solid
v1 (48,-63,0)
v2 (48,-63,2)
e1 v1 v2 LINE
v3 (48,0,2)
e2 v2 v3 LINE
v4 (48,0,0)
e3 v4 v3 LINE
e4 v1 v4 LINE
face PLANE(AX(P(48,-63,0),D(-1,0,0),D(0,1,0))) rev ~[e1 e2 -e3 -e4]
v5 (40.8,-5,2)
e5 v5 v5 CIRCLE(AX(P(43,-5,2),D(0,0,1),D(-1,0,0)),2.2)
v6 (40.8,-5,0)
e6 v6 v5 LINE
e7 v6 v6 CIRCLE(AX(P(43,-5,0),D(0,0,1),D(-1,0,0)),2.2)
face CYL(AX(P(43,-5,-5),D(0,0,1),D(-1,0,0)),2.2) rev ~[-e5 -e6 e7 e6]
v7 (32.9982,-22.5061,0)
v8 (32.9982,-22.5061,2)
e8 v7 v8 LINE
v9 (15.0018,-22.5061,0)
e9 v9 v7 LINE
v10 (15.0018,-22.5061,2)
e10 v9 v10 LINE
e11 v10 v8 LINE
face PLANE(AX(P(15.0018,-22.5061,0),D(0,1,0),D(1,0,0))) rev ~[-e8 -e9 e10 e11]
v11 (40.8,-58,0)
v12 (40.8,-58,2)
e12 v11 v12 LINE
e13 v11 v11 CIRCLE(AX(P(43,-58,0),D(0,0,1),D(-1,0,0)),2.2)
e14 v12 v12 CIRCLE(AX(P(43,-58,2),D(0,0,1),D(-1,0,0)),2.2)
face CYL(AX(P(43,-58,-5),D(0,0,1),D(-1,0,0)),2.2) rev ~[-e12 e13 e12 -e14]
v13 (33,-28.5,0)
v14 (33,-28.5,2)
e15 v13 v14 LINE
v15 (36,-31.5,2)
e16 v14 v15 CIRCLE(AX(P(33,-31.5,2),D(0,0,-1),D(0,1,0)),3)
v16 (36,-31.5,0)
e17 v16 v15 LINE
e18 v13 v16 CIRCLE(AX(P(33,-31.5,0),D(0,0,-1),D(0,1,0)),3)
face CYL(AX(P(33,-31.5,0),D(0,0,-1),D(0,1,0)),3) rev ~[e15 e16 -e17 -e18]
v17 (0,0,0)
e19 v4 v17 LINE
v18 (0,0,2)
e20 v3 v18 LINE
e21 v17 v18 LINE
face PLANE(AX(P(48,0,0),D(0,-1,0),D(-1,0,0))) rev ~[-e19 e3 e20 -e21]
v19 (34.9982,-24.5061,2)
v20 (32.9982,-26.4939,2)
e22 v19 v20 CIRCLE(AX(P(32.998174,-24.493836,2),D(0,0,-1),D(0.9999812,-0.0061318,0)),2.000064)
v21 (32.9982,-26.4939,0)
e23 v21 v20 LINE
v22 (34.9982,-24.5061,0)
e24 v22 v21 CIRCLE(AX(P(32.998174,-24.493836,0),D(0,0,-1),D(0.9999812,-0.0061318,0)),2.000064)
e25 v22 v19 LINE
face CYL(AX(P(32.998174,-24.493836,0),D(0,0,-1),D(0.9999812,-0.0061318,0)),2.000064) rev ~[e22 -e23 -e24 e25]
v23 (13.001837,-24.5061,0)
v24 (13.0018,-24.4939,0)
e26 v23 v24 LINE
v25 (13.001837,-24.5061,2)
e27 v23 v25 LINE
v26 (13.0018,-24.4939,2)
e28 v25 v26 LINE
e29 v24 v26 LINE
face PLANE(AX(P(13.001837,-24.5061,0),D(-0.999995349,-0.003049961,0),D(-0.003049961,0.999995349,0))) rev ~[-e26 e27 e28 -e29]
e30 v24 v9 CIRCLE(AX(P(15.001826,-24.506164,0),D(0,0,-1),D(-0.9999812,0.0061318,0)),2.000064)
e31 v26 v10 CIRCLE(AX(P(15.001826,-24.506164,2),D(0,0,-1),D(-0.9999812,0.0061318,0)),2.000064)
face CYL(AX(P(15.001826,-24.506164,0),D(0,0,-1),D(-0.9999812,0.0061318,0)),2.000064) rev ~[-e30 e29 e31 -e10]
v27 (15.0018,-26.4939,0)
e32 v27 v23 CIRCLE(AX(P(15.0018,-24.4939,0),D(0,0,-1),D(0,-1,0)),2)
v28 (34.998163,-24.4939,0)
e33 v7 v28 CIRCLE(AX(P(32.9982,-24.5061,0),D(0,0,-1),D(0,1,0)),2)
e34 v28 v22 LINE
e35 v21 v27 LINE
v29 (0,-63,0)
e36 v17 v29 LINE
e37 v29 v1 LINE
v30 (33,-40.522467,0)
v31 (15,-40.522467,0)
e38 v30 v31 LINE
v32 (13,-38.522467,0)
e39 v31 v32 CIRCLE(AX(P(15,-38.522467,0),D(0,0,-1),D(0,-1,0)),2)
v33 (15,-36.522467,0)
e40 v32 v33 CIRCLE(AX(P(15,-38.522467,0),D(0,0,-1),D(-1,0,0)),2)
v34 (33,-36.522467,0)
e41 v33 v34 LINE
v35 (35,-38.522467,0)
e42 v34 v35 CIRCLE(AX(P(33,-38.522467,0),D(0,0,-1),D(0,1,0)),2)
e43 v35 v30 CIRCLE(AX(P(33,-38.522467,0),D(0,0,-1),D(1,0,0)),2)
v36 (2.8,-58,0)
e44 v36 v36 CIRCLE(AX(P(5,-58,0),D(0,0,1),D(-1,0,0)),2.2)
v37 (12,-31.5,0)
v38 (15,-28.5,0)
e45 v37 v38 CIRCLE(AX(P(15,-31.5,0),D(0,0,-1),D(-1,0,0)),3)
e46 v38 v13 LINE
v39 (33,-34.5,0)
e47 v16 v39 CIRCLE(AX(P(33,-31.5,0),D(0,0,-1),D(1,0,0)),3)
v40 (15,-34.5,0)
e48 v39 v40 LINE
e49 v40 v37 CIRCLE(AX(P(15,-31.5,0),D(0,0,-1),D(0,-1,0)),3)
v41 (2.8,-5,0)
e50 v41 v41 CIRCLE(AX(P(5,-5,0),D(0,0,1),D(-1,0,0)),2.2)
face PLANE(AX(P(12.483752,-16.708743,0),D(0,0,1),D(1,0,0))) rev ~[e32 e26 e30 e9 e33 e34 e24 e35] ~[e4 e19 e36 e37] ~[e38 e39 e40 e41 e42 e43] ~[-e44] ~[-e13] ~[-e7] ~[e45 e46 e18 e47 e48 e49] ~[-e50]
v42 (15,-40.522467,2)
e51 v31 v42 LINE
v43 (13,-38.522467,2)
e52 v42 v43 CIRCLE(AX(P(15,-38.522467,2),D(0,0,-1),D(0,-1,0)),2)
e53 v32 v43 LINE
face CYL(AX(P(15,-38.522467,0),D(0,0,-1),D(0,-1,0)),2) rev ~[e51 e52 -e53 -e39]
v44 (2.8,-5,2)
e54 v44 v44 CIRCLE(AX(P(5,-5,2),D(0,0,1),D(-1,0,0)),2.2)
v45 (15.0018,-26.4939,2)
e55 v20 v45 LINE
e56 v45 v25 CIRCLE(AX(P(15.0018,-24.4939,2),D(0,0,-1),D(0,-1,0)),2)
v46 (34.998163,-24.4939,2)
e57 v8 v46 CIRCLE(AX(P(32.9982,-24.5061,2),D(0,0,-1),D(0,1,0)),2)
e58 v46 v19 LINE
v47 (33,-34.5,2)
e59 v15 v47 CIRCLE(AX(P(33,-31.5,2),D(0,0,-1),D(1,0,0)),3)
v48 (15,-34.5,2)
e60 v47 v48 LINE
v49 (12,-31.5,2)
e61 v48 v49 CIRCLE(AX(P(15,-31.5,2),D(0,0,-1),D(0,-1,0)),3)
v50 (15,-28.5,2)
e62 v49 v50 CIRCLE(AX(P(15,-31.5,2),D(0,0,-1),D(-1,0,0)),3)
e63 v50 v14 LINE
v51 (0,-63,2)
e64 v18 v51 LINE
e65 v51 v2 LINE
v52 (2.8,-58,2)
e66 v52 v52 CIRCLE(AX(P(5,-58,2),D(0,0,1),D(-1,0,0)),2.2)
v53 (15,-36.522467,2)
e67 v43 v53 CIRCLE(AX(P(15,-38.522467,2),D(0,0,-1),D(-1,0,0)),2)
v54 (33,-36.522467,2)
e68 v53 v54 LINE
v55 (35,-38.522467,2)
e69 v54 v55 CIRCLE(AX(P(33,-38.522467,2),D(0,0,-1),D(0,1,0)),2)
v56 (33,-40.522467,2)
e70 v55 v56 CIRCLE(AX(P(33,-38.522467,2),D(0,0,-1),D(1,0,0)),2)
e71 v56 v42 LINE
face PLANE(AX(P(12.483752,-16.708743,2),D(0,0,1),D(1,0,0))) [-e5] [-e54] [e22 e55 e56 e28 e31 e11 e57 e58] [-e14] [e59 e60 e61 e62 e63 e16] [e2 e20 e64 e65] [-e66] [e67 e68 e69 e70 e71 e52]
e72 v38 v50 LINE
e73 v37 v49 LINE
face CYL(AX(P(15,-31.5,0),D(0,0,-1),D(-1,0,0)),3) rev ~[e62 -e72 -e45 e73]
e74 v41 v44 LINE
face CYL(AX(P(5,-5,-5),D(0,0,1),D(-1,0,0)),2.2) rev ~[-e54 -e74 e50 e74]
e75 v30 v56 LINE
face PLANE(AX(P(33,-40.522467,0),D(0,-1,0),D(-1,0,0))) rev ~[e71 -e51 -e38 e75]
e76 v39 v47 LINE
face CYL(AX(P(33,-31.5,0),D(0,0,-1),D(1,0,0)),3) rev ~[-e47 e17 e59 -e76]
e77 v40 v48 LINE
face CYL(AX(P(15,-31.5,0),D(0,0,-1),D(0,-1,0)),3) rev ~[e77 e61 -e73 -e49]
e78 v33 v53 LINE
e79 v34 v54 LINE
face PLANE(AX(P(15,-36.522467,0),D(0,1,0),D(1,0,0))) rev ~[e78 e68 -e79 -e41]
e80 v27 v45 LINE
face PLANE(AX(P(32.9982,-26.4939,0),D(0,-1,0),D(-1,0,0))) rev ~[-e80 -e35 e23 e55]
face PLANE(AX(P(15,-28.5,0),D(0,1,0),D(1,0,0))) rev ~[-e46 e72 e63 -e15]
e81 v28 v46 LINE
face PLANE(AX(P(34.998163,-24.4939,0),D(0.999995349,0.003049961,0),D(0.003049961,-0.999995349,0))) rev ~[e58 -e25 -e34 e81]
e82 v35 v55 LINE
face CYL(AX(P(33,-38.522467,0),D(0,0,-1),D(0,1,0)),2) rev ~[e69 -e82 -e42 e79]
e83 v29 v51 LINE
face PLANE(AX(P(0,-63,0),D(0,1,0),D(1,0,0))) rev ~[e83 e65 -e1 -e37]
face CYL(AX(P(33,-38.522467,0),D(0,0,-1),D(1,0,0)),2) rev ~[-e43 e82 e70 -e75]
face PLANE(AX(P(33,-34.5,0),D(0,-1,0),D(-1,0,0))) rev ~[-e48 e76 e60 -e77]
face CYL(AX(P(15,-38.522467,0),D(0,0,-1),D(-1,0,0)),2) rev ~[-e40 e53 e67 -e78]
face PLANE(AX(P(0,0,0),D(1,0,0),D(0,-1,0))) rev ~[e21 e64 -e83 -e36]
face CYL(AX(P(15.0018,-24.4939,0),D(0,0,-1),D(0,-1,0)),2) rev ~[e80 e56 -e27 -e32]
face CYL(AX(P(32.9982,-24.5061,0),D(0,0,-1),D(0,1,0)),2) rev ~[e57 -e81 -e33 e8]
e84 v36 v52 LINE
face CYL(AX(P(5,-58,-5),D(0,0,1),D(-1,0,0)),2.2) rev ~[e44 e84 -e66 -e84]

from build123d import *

# Parameters (mm, degrees)
F1_DEPTH = 2
F2_D     = 4.4
F2_DEPTH = 5
F2_TIP   = 1.3218933619


# Not quite as in the source:
# - ends of sketch curves that miss each other by under 0.0002 mm in the source are joined


with BuildPart() as f1:
    # F0 (on Top) → F1 (new body)
    with BuildSketch(Plane.XY):
        with BuildLine():
            Line((24, 0), (0, 0))
            Line((0, 0), (0, -31.5))
            Line((0, -31.5), (12, -31.5))
            ThreePointArc((12, -31.5), (12.8786796564, -29.3786796564), (15, -28.5))
            Line((15, -28.5), (24, -28.5))
            Line((24, -28.5), (24, -26.4939))
            Line((24, -26.4939), (15.0018, -26.4939))
            ThreePointArc((15.0018, -26.4939), (13.5919063065, -25.9124202759), (13.001837209, -24.506099773))
            Line((13.001837209, -24.506099773), (13.0018, -24.4939))
            ThreePointArc((13.0018, -24.4939), (13.5919063065, -23.0875797241), (15.0018, -22.5061))
            Line((15.0018, -22.5061), (24, -22.5061))
            Line((24, -22.5061), (24, 0))
        make_face()
        with BuildLine():
            Line((48, 0), (24, 0))
            Line((24, 0), (24, -22.5061))
            Line((24, -22.5061), (32.9982, -22.5061))
            ThreePointArc((32.9982, -22.5061), (34.4080936935, -23.0875797241), (34.998162791, -24.493900227))
            Line((34.998162791, -24.493900227), (34.9982, -24.5061))
            ThreePointArc((34.9982, -24.5061), (34.4080936935, -25.9124202759), (32.9982, -26.4939))
            Line((32.9982, -26.4939), (24, -26.4939))
            Line((24, -26.4939), (24, -28.5))
            Line((24, -28.5), (33, -28.5))
            ThreePointArc((33, -28.5), (35.1213203436, -29.3786796564), (36, -31.5))
            Line((36, -31.5), (48, -31.5))
            Line((48, -31.5), (48, 0))
        make_face()
        with BuildLine():
            Line((12, -31.5), (0, -31.5))
            Line((0, -31.5), (0, -63))
            Line((0, -63), (24, -63))
            Line((24, -63), (24, -40.5224670172))
            Line((24, -40.5224670172), (15, -40.5224670172))
            ThreePointArc((15, -40.5224670172), (13.5857864376, -39.9366805795), (13, -38.5224670172))
            ThreePointArc((13, -38.5224670172), (13.5857864376, -37.1082534548), (15, -36.5224670172))
            Line((15, -36.5224670172), (24, -36.5224670172))
            Line((24, -36.5224670172), (24, -34.5))
            Line((24, -34.5), (15, -34.5))
            ThreePointArc((15, -34.5), (12.8786796564, -33.6213203436), (12, -31.5))
        make_face()
        with BuildLine():
            Line((48, -63), (48, -31.5))
            Line((48, -31.5), (36, -31.5))
            ThreePointArc((36, -31.5), (35.1213203436, -33.6213203436), (33, -34.5))
            Line((33, -34.5), (24, -34.5))
            Line((24, -34.5), (24, -36.5224670172))
            Line((24, -36.5224670172), (33, -36.5224670172))
            ThreePointArc((33, -36.5224670172), (34.4142135624, -37.1082534548), (35, -38.5224670172))
            ThreePointArc((35, -38.5224670172), (34.4142135624, -39.9366805795), (33, -40.5224670172))
            Line((33, -40.5224670172), (24, -40.5224670172))
            Line((24, -40.5224670172), (24, -63))
            Line((24, -63), (48, -63))
        make_face()
    extrude(amount=F1_DEPTH)

    # F2
    with Locations(Plane(origin=(0, 0, 0), x_dir=(1, 0, 0), z_dir=(0, 0, -1))):
        with Locations((5, 5), (43, 5), (43, 58), (5, 58)):
            Hole(F2_D / 2, depth=F2_DEPTH)
            with Locations((0, 0, -(F2_DEPTH + F2_TIP / 2))):  # 118° drill point
                Cone(0, F2_D / 2, F2_TIP, mode=Mode.SUBTRACT)


solid = f1.part
